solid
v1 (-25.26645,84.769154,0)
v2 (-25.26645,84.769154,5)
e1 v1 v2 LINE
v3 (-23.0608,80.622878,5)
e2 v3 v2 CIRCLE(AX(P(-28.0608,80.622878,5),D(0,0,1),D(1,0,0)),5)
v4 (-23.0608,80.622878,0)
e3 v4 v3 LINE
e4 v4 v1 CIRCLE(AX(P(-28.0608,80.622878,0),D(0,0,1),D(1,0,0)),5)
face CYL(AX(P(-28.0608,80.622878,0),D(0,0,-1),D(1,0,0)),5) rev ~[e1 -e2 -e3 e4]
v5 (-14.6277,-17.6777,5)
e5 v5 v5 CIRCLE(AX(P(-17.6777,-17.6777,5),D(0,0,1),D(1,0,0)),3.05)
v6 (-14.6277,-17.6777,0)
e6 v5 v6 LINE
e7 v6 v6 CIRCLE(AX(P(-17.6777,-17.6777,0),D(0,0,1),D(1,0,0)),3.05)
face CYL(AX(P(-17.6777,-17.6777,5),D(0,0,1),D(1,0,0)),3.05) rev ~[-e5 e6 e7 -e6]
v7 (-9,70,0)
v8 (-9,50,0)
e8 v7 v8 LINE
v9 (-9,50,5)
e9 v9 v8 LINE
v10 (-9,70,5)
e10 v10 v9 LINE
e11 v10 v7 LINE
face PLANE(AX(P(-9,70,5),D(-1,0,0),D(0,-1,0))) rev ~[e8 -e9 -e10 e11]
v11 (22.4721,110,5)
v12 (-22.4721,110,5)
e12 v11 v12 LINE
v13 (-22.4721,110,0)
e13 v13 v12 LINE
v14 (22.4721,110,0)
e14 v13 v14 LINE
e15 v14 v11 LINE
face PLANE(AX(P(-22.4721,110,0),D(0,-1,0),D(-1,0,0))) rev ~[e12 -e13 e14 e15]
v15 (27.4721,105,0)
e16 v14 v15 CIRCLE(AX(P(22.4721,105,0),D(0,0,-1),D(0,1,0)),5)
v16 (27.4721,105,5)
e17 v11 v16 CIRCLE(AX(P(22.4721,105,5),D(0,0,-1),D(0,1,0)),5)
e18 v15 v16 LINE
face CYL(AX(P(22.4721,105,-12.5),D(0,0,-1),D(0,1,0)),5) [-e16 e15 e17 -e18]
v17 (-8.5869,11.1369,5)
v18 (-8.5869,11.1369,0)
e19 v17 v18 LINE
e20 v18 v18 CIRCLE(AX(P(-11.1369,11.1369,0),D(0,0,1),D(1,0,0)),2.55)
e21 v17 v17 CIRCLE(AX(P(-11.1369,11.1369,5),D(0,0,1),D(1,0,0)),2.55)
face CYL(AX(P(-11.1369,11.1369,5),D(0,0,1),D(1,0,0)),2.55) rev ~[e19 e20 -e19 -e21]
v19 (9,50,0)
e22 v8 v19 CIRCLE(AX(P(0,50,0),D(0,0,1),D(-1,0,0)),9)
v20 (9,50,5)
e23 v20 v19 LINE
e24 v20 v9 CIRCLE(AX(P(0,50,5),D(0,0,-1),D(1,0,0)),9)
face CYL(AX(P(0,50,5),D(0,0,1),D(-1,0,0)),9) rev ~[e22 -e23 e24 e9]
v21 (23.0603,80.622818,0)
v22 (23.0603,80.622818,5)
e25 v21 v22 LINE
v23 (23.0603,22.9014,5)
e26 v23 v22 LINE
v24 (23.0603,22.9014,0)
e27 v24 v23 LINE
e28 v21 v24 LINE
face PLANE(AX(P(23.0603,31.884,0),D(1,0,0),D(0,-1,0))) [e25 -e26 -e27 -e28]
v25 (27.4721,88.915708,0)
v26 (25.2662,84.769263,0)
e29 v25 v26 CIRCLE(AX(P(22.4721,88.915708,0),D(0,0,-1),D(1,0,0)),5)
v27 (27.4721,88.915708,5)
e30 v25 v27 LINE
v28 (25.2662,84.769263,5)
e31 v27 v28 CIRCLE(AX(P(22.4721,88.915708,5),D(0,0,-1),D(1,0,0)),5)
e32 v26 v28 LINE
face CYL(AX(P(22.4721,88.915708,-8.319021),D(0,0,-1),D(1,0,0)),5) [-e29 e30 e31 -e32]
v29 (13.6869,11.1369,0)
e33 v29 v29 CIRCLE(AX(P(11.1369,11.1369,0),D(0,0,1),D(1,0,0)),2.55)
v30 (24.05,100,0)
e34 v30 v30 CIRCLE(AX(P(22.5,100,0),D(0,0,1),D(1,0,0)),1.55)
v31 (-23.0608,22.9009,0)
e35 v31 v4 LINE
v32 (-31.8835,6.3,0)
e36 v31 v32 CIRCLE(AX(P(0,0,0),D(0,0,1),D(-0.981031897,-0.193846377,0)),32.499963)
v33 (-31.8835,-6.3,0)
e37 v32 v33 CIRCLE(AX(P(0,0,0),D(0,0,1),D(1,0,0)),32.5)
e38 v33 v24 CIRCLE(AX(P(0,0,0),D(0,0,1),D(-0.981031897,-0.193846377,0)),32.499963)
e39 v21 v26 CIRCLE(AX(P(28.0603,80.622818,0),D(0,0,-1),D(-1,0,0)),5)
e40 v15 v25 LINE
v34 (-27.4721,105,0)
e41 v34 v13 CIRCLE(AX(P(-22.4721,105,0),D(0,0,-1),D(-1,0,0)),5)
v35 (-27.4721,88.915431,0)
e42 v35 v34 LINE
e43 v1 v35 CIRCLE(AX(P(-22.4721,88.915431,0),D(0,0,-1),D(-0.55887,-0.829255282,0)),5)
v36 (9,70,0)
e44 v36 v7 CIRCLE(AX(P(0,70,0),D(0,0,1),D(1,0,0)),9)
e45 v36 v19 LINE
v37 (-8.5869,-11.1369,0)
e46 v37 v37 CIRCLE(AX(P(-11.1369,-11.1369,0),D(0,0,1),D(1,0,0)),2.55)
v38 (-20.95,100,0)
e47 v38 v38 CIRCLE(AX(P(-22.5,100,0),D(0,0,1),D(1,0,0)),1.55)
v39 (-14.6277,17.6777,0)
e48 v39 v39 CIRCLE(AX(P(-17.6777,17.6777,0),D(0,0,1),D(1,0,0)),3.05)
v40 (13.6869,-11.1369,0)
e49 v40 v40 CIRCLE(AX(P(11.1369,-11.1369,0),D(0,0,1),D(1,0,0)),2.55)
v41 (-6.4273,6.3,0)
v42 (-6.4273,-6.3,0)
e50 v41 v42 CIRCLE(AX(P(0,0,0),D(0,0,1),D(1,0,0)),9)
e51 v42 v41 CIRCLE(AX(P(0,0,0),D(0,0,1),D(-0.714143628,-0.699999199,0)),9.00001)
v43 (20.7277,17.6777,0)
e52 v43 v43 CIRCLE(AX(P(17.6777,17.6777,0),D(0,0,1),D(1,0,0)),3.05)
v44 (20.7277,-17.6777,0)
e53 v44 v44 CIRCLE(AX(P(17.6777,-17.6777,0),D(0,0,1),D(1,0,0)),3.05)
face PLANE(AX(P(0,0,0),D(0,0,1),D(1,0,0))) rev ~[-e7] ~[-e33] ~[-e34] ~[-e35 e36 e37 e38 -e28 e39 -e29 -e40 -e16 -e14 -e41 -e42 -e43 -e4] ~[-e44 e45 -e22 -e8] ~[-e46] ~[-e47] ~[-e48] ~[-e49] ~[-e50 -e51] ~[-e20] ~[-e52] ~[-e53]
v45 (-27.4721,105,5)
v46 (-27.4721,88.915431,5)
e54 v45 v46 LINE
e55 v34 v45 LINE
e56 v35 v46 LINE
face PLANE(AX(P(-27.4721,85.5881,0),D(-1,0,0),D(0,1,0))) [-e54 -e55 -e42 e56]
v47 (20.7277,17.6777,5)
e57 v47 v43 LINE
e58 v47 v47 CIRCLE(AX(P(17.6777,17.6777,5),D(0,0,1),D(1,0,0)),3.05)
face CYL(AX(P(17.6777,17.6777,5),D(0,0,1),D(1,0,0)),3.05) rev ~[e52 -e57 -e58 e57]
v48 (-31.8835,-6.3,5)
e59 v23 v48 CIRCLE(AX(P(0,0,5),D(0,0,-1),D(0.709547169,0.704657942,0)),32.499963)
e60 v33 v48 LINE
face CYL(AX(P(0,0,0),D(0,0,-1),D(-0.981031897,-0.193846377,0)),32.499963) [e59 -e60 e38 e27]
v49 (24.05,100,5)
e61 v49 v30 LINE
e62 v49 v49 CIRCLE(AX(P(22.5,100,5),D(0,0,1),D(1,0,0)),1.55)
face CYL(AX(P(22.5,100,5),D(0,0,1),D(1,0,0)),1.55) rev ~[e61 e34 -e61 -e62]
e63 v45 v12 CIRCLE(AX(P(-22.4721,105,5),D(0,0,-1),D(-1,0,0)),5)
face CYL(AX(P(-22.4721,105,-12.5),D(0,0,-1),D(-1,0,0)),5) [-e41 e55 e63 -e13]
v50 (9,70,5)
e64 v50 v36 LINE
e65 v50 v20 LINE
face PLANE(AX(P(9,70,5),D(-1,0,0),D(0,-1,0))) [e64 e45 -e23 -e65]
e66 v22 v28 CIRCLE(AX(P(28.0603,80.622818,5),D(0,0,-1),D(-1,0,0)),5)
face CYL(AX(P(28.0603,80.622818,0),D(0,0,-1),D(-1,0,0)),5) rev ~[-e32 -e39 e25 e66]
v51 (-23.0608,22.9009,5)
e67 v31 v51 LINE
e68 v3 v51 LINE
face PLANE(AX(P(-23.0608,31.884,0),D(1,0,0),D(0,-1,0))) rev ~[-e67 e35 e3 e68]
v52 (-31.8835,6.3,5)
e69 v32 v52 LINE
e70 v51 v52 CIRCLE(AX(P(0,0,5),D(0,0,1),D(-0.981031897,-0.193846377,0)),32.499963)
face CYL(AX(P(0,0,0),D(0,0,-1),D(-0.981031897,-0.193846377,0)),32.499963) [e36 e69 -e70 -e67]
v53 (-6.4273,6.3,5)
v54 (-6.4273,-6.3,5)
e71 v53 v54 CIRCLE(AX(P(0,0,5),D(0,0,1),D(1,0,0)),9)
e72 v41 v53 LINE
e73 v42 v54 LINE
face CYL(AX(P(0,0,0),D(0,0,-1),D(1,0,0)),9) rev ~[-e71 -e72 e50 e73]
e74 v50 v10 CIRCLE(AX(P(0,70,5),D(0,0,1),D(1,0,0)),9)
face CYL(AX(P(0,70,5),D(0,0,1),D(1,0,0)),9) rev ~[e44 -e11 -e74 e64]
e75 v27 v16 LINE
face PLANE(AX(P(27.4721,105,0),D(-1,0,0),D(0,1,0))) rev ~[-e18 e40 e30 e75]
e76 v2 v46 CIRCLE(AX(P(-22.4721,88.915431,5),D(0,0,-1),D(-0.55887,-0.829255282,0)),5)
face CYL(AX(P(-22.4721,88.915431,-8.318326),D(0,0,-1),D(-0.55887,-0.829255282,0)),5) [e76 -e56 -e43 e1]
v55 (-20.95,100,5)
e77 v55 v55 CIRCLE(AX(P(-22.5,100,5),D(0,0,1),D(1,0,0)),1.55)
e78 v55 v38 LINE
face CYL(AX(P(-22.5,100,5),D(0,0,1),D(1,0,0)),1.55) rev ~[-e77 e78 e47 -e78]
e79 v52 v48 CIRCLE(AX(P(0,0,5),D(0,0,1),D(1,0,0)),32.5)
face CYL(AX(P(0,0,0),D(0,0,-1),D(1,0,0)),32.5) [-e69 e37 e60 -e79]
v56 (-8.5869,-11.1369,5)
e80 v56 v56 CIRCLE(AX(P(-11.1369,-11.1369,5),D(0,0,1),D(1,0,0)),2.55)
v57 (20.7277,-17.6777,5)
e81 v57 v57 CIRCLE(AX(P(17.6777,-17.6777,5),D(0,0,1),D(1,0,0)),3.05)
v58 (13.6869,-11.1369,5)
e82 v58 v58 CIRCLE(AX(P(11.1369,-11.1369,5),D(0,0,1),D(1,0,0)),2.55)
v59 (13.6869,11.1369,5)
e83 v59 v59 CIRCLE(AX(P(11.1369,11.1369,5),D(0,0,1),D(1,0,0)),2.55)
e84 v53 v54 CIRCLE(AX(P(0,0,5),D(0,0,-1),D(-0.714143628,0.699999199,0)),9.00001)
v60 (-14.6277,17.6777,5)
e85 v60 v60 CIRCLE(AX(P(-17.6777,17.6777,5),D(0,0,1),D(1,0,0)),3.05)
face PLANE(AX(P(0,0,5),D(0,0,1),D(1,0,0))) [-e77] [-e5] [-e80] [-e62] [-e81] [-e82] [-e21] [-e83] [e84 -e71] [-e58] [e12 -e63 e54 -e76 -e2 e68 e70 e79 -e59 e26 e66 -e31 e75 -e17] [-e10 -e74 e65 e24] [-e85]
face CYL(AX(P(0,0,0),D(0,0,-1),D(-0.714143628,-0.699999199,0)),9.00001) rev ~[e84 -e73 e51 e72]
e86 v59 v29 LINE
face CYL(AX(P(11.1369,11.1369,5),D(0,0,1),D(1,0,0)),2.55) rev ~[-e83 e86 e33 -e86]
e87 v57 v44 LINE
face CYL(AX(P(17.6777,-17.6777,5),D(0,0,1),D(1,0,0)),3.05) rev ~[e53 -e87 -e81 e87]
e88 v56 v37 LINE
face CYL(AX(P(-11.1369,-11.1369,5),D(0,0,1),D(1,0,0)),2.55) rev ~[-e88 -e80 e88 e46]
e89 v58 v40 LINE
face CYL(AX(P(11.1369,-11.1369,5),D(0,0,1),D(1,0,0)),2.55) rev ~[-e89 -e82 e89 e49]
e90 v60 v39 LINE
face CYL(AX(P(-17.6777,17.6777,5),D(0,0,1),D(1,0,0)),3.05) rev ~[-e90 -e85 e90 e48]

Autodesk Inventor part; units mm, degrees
ref_plane "YZ Plane" through (0, 0, 0) normal (1, 0, 0) x (0, 1, 0)
ref_plane "XZ Plane" through (0, 0, 0) normal (0, 1, 0) x (-1, 0, 0)
ref_plane "XY Plane" through (0, 0, 0) normal (0, 0, 1) x (1, 0, 0)
sketch "Sketch1" plane through (0, 0, 0) normal (0, 0, 1) x (1, 0, 0)
  circle A0 centre (17.6777, -17.6777) radius 3
  circle A1 centre (-17.6777, -17.6777) radius 3
  circle A2 centre (-17.6777, 17.6777) radius 3
  circle A3 centre (17.6777, 17.6777) radius 3
  circle A4 centre (-11.1369, -11.1369) radius 2.5
  circle A5 centre (11.1369, -11.1369) radius 2.5
  circle A6 centre (-11.1369, 11.1369) radius 2.5
  circle A7 centre (11.1369, 11.1369) radius 2.5
  arc A8 (-6.4273, -6.3) -> (-6.4273, 6.3) centre (0, 0) ccw
  arc A9 (-31.8835, -6.3) -> (-31.8835, 6.3) centre (0, 0) ccw
  circle A10 centre (0, 0) radius 32.5
  circle A11 centre (0, 0) radius 9
  line L0 (22.4721, 110) -> (-22.4721, 110)
  line L1 (-27.4721, 105) -> (-27.4721, 90)
  line L2 (-23.0608, 85.5886) -> (-23.0608, 31.884)
  line L3 (23.0603, 31.884) -> (23.0603, 85.5881)
  line L4 (27.4721, 90) -> (27.4721, 105)
  circle A12 centre (22.5, 100) radius 1.5
  circle A13 centre (-22.5, 100) radius 1.5
  circle A14 centre (11.1369, -11.1369) radius 2.5
  circle A15 centre (11.1369, 11.1369) radius 2.5
  circle A16 centre (-11.1369, 11.1369) radius 2.5
  circle A17 centre (-11.1369, -11.1369) radius 2.5
  line L5 (27.4721, 105) -> (27.4721, 110)
  line L6 (27.4721, 110) -> (-27.4721, 110)
  line L7 (-27.4721, 110) -> (-27.4721, 105)
  line L8 (27.4721, 90) -> (27.4721, 85.5881)
  line L9 (27.4721, 85.5881) -> (-27.4721, 85.5881)
  line L10 (-27.4721, 85.5881) -> (-27.4721, 90)
  line L11 (-23.0608, 31.884) -> (-23.0608, 22.9009)
  line L12 (23.0603, 31.884) -> (23.0603, 22.9014)
  point P0 (-31.8835, 6.3)
  point P1 (-23.0608, 85.5881)
  point P2 (-6.4273, 6.3)
extrude "Extrusion1" add sketch "Sketch1" along normal blind 5
fillet "Fillet1" radius 5 6 edges at (-27.4721, 110, 2.5) (27.4721, 110, 2.5) (-27.4721, 85.5881, 2.5) (-23.0608, 85.5881, 2.5) (27.4721, 85.5881, 2.5) (23.0603, 85.5881, 2.5)
sketch "Sketch2" plane through (0, 0, 5) normal (0, 0, 1) x (1, 0, 0)
  circle A0 centre (-22.5, 100) radius 1.5 projected
  arc A1 (9, 70) -> (-9, 70) centre (0, 70) ccw
  line L0 (-9, 70) -> (-9, 50)
  line L1 (9, 70) -> (9, 50)
  line L2 (0, 40) -> (0, 50)
  arc A2 (-9, 50) -> (9, 50) centre (0, 50) ccw
  point P0 (0, 0)
  dimension "d9" = 18
  dimension "d12" = 10
  dimension "d13" = 18
extrude "Extrusion2" cut sketch "Sketch2" against normal blind 10 contours L1 A2 L0 A1
sketch "Sketch3" plane through (0, 0, 5) normal (0, 0, 1) x (1, 0, 0)
  circle A0 centre (-22.5, 100) radius 1.5 projected
  circle A1 centre (-22.5, 100) radius 1.55
  circle A2 centre (22.5, 100) radius 1.5 projected
  circle A3 centre (22.5, 100) radius 1.55
  circle A4 centre (-17.6777, 17.6777) radius 3 projected
  circle A5 centre (-17.6777, 17.6777) radius 3.05
  circle A6 centre (17.6777, 17.6777) radius 3 projected
  circle A7 centre (17.6777, 17.6777) radius 3.05
  circle A8 centre (11.1369, 11.1369) radius 2.5 projected
  circle A9 centre (11.1369, 11.1369) radius 2.55
  circle A10 centre (-11.1369, 11.1369) radius 2.5 projected
  circle A11 centre (-11.1369, 11.1369) radius 2.55
  circle A12 centre (-11.1369, -11.1369) radius 2.5 projected
  circle A13 centre (-11.1369, -11.1369) radius 2.55
  circle A14 centre (11.1369, -11.1369) radius 2.5 projected
  circle A15 centre (11.1369, -11.1369) radius 2.55
  circle A16 centre (-17.6777, -17.6777) radius 3 projected
  circle A17 centre (-17.6777, -17.6777) radius 3.05
  circle A18 centre (17.6777, -17.6777) radius 3 projected
  circle A19 centre (17.6777, -17.6777) radius 3.05
  point P0 (0, 0)
  dimension "d14" = 3.1
  dimension "d15" = 3.1
  dimension "d16" = 6.1
  dimension "d17" = 6.1
  dimension "d18" = 5.1
  dimension "d19" = 5.1
  dimension "d20" = 5.1
  dimension "d21" = 5.1
  dimension "d22" = 6.1
  dimension "d23" = 6.1
extrude "Extrusion3" cut sketch "Sketch3" against normal blind 10 contours A0 | A1 | A2 | A3 | A4 | A5 | A6 | A7 | A8 | A9 | A10 | A11 | A12 | A13 | A14 | A15 | A16 | A17 | A18 | A19
properties part number "Part2_Camera"
